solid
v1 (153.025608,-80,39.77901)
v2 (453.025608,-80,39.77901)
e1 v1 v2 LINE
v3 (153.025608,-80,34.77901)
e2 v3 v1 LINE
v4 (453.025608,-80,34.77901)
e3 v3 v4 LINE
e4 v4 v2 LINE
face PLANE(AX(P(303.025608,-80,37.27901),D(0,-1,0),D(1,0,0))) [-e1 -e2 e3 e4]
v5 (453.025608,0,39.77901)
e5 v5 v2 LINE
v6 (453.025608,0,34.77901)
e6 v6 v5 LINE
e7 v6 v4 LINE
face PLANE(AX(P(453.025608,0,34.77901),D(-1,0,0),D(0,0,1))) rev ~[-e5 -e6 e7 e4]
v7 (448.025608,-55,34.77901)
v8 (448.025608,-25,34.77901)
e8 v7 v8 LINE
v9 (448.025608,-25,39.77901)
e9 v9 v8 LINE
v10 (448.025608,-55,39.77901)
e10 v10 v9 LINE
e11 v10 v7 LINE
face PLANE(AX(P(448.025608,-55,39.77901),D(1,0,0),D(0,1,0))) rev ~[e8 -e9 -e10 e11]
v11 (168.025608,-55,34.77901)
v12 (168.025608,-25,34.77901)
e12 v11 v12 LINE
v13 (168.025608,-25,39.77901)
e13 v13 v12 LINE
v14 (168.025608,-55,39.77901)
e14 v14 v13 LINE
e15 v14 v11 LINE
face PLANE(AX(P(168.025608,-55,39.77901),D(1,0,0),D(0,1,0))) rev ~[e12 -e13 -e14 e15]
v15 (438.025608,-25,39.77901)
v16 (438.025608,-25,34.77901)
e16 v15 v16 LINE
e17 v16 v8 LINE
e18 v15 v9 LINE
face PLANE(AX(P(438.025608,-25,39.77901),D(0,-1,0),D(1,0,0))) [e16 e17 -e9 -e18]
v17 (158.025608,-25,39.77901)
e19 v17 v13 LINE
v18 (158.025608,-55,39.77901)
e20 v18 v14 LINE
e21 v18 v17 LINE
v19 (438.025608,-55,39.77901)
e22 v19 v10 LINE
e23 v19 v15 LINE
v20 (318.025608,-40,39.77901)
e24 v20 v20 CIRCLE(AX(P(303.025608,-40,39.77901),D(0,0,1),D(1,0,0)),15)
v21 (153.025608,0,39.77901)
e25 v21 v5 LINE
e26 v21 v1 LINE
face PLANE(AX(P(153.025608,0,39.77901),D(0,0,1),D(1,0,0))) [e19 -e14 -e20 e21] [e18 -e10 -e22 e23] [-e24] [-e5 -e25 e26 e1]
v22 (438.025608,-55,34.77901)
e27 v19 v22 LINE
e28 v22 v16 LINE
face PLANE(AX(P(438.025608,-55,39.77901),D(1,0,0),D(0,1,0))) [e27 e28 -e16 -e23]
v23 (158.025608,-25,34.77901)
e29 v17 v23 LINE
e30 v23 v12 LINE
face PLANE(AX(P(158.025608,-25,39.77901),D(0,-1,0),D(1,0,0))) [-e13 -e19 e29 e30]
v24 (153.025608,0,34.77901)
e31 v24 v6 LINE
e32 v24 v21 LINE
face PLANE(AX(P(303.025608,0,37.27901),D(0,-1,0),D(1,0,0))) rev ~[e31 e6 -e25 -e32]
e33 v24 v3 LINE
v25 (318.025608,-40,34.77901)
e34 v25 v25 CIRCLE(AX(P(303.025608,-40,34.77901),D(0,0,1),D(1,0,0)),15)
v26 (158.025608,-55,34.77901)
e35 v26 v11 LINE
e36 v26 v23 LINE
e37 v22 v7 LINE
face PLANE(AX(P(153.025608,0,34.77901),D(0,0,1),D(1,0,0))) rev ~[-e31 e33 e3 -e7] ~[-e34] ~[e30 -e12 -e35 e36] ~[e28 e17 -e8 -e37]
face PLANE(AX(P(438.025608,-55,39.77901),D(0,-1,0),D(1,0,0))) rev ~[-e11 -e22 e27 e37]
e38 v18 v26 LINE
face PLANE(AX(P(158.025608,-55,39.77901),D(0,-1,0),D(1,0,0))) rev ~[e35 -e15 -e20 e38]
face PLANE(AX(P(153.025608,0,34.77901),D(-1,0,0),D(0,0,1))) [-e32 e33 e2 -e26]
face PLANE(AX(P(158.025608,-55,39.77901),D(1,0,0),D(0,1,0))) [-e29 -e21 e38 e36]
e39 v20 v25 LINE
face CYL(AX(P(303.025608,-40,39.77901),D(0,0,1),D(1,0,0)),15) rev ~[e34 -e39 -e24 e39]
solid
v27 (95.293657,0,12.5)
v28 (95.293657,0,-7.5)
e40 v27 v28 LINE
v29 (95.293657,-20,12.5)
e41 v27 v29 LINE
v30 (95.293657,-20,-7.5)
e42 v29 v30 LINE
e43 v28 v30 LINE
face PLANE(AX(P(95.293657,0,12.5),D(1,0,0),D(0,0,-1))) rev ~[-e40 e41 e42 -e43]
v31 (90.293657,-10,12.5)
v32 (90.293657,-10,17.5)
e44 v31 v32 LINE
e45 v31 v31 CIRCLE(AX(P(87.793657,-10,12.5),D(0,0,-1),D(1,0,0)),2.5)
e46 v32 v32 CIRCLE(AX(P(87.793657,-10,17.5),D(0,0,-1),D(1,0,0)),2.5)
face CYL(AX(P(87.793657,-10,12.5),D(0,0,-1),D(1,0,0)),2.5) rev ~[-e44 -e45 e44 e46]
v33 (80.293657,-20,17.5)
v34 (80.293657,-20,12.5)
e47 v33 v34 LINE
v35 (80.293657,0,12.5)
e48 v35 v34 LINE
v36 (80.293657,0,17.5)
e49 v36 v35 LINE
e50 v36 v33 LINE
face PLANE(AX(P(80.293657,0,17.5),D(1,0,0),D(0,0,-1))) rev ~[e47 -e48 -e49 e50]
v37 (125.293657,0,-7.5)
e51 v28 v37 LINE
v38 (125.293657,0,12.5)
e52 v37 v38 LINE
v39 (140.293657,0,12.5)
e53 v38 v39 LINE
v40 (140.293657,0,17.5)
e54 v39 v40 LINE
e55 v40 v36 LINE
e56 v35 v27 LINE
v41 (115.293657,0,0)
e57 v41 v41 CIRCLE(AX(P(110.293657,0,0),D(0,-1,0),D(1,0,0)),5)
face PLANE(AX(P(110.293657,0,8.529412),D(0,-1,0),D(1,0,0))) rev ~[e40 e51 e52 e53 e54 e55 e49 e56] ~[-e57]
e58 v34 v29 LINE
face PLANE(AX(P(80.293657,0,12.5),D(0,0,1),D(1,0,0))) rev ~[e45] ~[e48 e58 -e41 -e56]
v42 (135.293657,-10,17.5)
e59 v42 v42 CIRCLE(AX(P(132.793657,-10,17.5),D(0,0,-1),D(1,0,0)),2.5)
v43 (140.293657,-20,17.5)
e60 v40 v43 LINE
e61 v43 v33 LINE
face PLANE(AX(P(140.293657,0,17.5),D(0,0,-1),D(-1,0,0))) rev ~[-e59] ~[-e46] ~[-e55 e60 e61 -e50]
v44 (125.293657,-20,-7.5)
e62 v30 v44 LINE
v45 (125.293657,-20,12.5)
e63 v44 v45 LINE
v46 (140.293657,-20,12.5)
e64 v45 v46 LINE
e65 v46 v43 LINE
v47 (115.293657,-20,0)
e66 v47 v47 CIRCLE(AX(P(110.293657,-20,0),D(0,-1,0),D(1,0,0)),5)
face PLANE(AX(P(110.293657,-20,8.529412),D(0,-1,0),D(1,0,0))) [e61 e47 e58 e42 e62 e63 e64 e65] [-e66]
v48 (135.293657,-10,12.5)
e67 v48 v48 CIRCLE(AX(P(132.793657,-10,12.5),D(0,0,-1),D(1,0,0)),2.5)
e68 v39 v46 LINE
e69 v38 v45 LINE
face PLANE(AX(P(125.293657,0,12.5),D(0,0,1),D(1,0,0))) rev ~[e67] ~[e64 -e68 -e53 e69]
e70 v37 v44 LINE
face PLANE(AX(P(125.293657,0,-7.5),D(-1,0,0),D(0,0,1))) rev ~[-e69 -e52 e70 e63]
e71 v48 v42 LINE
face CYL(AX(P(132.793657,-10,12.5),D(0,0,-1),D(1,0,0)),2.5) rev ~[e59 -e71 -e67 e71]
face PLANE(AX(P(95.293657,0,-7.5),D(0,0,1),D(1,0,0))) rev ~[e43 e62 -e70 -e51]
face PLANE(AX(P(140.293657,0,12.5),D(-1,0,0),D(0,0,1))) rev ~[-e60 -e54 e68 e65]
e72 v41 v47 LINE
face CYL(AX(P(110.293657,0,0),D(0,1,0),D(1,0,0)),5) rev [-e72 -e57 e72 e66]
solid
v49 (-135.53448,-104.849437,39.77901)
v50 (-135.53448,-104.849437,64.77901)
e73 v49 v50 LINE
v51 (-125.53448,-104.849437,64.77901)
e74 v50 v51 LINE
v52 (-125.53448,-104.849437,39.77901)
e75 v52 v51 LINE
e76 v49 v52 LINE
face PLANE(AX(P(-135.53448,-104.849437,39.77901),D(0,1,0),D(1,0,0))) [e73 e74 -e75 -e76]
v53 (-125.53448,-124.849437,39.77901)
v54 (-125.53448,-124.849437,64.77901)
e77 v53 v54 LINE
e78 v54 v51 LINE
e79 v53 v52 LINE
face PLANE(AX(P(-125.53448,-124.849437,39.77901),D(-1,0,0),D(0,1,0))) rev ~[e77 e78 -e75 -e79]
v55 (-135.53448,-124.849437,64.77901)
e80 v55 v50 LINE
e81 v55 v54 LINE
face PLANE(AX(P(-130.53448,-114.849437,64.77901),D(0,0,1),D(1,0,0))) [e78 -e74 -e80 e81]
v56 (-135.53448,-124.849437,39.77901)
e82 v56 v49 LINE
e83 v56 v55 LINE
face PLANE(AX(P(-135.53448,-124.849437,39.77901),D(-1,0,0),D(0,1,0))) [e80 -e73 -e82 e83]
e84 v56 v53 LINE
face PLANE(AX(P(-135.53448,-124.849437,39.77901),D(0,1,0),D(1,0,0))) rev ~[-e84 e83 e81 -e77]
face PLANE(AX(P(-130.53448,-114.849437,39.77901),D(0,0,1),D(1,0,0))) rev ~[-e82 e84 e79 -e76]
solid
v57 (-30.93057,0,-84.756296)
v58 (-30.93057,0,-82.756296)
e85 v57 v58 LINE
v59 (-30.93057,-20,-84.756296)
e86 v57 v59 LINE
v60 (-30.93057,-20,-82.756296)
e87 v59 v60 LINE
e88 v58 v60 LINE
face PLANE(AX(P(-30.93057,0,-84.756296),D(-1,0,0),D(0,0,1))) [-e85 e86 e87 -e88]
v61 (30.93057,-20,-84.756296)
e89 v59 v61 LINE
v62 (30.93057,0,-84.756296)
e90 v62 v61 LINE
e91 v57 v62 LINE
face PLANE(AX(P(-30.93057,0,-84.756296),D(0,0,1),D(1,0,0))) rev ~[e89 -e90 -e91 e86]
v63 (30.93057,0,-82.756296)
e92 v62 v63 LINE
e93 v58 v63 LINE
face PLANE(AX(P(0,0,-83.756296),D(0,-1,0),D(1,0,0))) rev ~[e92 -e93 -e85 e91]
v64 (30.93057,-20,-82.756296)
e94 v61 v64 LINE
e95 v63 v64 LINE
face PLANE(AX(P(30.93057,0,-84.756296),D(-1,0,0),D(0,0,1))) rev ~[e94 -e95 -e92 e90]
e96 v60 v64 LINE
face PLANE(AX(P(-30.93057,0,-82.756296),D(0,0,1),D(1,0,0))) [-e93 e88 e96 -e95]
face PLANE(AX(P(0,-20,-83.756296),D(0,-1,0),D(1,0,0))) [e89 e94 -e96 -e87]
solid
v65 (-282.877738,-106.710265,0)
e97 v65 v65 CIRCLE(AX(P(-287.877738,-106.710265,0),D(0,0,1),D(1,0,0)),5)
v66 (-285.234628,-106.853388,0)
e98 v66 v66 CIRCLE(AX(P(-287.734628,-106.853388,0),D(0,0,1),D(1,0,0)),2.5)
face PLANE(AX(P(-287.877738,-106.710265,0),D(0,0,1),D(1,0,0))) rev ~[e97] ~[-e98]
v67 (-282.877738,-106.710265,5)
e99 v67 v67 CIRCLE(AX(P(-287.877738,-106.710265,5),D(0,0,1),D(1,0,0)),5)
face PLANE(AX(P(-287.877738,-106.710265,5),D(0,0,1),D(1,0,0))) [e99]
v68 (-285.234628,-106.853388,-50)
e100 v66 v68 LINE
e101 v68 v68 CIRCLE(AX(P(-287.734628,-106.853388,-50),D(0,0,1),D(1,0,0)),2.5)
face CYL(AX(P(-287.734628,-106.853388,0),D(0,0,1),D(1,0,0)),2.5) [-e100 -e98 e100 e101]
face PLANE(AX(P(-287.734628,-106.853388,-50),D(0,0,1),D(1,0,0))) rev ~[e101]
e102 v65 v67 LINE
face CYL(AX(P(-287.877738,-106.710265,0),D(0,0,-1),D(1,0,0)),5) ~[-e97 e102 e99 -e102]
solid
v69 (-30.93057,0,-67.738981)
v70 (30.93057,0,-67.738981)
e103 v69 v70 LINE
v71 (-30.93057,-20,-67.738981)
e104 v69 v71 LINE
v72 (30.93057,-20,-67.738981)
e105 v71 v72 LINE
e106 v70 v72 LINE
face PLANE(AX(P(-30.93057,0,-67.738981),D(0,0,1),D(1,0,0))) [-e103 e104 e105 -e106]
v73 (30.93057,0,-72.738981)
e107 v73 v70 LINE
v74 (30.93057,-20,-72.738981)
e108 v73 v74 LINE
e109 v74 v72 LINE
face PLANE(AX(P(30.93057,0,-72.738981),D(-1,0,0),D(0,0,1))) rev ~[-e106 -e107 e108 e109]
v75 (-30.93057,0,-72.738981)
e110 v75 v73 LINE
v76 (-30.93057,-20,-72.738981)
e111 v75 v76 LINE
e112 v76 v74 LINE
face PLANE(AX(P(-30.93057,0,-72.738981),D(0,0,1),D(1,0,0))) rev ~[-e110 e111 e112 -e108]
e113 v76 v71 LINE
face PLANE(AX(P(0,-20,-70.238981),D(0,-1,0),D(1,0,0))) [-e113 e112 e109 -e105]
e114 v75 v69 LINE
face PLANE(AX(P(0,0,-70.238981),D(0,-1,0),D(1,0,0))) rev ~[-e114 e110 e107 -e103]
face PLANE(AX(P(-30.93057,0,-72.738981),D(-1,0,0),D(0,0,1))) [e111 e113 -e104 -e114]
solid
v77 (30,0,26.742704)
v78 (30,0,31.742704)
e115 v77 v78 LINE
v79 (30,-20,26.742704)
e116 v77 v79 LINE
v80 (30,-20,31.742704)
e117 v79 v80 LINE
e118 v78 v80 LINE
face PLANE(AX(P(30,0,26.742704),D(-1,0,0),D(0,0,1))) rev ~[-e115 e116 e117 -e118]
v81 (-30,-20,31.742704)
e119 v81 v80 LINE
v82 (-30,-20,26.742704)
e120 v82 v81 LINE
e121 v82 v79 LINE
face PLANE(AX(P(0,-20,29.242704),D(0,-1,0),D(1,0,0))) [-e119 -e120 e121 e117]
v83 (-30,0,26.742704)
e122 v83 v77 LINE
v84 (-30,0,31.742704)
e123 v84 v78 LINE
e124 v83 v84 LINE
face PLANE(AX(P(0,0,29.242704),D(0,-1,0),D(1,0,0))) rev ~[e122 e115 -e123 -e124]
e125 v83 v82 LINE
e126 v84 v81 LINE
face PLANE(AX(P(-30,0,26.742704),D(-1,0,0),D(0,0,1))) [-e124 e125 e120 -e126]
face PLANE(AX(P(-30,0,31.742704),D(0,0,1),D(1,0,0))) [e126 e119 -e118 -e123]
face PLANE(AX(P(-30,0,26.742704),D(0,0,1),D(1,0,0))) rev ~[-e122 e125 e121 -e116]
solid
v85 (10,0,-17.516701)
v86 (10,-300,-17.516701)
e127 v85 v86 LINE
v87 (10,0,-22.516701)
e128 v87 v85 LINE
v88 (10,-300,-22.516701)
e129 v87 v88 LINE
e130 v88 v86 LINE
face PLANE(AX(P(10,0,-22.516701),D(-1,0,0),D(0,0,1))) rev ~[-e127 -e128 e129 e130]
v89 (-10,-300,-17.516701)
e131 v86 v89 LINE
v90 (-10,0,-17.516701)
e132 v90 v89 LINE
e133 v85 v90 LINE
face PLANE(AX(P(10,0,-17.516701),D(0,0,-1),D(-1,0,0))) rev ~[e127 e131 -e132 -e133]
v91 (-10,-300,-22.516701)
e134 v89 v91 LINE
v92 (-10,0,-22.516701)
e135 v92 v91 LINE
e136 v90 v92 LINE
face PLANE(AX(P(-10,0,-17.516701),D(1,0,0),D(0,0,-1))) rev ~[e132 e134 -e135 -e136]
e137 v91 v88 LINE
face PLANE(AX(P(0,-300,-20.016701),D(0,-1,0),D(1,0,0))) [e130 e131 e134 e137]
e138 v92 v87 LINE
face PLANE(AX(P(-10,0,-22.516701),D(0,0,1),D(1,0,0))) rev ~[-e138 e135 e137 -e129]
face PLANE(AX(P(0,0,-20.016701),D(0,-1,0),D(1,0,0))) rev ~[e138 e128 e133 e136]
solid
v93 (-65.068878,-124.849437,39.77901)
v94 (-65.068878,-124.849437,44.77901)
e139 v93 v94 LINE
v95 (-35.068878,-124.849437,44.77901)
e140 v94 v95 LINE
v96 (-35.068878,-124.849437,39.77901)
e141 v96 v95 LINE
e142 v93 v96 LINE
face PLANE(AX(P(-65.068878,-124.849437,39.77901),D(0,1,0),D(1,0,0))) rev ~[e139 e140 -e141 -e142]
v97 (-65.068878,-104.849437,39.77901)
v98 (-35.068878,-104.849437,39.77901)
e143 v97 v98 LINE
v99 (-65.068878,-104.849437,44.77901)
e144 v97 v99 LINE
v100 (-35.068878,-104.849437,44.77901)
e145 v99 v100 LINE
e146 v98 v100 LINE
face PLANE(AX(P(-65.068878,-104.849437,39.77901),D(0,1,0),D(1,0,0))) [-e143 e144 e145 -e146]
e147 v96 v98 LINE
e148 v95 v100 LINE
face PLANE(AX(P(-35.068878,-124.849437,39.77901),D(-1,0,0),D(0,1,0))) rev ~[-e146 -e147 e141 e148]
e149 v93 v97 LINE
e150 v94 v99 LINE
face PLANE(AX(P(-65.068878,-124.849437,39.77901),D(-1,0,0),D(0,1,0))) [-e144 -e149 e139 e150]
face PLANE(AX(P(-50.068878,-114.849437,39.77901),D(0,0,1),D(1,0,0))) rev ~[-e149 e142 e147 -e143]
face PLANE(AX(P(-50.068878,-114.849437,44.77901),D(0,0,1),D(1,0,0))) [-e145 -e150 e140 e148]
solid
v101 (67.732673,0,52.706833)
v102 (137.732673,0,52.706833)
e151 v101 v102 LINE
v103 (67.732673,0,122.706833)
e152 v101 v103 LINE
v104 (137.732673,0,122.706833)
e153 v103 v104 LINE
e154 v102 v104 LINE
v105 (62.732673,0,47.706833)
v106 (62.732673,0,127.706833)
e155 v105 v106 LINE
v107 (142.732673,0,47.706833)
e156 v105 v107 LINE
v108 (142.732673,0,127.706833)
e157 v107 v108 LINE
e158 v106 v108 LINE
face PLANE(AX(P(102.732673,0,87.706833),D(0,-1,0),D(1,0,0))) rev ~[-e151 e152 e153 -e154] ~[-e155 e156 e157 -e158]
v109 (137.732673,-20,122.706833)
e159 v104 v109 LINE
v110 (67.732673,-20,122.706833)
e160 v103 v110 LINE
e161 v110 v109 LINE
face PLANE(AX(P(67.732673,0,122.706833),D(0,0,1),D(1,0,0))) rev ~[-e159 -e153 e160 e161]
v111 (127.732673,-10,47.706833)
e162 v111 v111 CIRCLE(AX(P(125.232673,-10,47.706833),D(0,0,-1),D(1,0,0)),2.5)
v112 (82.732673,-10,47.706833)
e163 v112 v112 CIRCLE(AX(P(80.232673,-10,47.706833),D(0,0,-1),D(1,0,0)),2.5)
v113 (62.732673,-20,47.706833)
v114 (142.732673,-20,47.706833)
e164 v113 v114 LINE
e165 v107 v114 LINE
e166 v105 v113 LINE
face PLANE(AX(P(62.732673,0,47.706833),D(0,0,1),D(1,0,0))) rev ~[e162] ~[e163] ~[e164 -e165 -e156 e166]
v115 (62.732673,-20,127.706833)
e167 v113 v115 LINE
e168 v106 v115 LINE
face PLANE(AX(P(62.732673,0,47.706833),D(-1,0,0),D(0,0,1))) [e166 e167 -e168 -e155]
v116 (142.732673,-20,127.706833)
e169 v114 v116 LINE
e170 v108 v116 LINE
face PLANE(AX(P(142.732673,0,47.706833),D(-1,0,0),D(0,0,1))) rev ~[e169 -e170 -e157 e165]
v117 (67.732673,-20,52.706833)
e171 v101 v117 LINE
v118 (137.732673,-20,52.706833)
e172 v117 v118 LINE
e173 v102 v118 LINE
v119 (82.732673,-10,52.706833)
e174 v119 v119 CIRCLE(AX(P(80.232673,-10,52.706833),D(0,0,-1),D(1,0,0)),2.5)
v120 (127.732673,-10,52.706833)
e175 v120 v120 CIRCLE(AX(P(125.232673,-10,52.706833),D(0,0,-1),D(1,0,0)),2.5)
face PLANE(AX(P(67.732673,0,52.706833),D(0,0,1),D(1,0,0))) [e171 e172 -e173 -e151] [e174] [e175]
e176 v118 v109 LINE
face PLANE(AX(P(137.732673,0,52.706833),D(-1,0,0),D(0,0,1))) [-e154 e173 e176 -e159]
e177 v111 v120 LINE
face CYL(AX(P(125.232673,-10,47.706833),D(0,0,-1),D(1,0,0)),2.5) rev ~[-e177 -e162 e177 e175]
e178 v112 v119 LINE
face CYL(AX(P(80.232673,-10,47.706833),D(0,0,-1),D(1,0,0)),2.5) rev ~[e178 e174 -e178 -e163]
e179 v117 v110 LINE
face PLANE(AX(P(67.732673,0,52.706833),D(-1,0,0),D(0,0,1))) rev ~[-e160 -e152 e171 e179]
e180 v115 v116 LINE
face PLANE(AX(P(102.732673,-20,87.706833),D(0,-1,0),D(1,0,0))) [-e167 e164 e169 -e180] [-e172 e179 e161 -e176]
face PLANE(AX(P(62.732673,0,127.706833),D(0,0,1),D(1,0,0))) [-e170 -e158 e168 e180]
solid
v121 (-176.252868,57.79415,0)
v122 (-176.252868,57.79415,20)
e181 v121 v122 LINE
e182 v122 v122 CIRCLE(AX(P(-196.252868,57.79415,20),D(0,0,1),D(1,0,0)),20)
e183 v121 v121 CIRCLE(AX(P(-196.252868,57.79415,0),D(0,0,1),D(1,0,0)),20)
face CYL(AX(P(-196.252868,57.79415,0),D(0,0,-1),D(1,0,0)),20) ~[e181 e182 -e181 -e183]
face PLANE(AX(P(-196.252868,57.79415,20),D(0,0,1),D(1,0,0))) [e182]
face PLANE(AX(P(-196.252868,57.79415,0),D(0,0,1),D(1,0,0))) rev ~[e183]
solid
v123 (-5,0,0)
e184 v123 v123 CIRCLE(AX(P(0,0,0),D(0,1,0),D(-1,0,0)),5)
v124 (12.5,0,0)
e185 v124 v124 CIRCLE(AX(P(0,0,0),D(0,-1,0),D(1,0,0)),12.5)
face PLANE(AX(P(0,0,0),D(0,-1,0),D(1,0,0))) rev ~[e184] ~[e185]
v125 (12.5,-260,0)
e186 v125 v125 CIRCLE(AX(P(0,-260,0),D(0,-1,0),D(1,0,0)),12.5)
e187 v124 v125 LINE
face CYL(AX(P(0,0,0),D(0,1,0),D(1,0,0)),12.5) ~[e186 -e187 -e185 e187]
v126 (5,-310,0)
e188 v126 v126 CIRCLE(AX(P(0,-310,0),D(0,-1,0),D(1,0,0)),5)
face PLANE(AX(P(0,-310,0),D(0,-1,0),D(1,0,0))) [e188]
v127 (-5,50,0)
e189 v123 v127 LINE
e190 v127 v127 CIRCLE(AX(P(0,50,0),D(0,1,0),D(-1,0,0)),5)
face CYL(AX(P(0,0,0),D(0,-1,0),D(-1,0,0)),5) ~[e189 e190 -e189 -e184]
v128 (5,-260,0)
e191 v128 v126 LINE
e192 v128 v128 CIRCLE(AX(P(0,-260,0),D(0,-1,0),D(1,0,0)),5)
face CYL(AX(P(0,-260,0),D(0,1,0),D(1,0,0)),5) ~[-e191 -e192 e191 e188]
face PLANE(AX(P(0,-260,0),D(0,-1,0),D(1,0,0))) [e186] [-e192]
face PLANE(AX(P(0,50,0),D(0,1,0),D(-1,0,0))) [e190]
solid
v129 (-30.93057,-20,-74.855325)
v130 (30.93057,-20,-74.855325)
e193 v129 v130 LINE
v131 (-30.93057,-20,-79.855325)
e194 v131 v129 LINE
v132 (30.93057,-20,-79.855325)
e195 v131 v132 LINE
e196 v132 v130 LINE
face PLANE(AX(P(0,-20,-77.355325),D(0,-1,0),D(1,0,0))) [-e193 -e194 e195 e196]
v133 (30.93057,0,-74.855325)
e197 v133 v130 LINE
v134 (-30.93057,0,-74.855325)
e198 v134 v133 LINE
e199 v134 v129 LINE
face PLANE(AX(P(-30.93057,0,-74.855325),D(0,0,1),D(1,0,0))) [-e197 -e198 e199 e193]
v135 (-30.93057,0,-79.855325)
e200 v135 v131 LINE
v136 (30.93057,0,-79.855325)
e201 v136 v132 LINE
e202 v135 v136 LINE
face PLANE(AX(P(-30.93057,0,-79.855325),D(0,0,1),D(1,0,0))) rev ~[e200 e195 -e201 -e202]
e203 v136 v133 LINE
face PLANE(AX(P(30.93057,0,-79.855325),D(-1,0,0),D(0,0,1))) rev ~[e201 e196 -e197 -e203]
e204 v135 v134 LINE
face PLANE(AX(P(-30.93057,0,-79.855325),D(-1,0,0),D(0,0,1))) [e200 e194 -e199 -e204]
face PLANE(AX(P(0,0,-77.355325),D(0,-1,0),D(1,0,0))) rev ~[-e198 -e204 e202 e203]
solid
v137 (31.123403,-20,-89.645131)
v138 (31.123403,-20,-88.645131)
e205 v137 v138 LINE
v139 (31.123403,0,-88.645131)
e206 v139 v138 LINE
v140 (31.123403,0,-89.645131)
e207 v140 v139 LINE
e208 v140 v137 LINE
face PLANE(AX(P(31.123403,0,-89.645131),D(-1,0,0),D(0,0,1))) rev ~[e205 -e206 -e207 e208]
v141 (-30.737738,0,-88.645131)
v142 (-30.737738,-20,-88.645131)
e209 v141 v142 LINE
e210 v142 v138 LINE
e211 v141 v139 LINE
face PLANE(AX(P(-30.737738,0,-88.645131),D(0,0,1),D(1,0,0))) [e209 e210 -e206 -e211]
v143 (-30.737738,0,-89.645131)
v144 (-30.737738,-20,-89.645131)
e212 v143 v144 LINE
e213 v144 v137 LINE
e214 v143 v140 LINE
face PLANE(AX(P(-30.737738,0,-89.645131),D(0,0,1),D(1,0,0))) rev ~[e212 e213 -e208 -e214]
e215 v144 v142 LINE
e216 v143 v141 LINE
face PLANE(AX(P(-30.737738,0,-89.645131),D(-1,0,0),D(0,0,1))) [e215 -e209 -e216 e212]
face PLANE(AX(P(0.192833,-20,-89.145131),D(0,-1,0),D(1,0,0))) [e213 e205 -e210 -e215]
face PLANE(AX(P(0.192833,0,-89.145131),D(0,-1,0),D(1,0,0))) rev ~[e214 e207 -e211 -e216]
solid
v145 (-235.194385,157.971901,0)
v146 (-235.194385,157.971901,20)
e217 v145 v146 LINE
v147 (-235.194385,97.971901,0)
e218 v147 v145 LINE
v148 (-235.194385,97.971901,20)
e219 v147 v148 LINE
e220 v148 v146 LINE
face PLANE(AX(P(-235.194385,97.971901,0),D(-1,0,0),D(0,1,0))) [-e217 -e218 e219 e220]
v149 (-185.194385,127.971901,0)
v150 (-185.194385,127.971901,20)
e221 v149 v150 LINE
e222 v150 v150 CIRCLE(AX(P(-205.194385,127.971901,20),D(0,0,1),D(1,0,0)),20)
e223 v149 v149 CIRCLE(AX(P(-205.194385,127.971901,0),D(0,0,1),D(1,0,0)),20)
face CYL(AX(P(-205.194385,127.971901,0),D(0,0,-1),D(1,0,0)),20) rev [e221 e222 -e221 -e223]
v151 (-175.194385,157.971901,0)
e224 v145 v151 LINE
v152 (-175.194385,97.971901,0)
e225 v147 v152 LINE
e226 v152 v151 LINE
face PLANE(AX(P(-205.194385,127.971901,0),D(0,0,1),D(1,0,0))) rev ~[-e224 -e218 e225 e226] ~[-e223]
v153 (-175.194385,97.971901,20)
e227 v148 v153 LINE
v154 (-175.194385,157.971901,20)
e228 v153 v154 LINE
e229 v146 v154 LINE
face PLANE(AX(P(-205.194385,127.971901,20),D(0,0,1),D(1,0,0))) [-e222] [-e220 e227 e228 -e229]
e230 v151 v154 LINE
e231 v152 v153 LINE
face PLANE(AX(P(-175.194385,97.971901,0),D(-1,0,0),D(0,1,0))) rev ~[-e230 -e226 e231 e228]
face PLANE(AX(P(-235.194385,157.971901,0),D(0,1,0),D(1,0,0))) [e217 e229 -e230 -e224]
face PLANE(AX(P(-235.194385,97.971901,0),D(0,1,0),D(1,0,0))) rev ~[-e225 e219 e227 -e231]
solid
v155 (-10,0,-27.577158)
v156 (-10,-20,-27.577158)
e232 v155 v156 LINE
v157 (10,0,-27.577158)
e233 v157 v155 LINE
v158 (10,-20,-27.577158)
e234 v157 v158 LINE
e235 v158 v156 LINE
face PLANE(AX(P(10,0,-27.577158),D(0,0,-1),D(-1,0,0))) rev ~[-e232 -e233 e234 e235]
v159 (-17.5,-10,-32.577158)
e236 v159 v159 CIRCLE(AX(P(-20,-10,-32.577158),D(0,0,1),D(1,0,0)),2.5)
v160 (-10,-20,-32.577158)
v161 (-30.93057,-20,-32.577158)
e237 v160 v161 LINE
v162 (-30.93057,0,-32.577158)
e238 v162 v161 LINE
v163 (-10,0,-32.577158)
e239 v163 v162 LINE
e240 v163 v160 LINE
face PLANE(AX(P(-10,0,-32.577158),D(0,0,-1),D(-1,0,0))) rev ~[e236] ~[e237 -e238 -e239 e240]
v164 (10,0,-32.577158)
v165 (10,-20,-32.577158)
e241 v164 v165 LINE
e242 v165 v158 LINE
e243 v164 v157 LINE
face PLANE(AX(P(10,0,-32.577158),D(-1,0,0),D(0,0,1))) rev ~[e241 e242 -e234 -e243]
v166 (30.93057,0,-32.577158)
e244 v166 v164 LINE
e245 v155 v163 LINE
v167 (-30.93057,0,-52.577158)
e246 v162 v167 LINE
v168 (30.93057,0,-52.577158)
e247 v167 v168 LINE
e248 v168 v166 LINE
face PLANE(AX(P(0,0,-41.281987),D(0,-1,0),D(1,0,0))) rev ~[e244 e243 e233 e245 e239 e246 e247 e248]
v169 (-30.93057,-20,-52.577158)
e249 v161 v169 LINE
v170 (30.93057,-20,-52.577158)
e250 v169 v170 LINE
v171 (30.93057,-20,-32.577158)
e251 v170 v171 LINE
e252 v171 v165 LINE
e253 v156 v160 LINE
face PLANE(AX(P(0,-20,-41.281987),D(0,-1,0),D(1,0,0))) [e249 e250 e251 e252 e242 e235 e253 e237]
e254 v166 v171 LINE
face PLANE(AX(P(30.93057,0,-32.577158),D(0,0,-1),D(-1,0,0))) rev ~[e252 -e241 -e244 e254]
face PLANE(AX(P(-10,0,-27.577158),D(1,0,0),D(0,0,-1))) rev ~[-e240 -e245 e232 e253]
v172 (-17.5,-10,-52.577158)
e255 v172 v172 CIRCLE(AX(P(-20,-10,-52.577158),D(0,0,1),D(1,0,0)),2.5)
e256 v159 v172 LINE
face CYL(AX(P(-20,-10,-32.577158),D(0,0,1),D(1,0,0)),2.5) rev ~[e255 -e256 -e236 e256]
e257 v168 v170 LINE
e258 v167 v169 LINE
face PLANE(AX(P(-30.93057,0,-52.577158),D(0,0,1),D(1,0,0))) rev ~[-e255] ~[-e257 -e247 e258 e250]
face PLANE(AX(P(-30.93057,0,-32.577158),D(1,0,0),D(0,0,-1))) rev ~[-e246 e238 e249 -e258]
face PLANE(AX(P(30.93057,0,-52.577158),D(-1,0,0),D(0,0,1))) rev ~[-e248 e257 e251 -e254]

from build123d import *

# Parameters (mm, degrees)
F0_R      = 5
F1_DEPTH  = 20
F0_W      = 60
F0_H      = 5
F0_W_2    = 80
F0_H_2    = 80
F0_W_3    = 70
F0_H_3    = 70
F0_W_4    = 61.861140081
F0_H_4    = 1
F0_H_5    = 2
F0_R_2    = 12.5
F2_DEPTH  = 260
F3_R      = 5
F4_DEPTH  = 50
F5_DEPTH  = 300
F6_R      = 2.5
F7_DEPTH  = 25
F9_R      = 2.5
F8_R      = 2.5
F10_DEPTH = 25
F14_R     = 5
F15_DEPTH = 50
F16_W     = 300
F16_H     = 5
F17_DEPTH = 80
F19_R     = 20
F20_DEPTH = 20
F19_W     = 60
F19_H     = 60
F21_DEPTH = 20
F18_W     = 10
F18_H     = 30
F18_R     = 15
F22_DEPTH = 129.4251411048
F18_H_2   = 20
F23_DEPTH = 25
F18_W_2   = 30
F24_DEPTH = 5
F13_R     = 2.5
F25_DEPTH = 5
F26_R     = 5
F27_DEPTH = 5
F28_R     = 2.5
F29_DEPTH = 50


# Not quite as in the source:
# - a feature of the source that left no trace in its solid (it failed there, or was rolled back) is left out
# - a feature names something its author has since deleted; it is built from what else it names


with BuildPart() as f1:
    # F0 (on Front) → F1 (new body)
    with BuildSketch(Plane.XZ):
        Polygon((95.2936565876, -7.5), (110.2936565876, -7.5), (125.2936565876, -7.5), (125.2936565876, 12.5), (140.2936565876, 12.5), (140.2936565876, 17.5), (110.2936565876, 17.5), (80.2936565876, 17.5), (80.2936565876, 12.5), (95.2936565876, 12.5), align=None)
        with Locations((110.2936565876, 0)):
            Circle(F0_R, mode=Mode.SUBTRACT)
    extrude(amount=F1_DEPTH)

    # F9 (on face) + F8 (on face) → F10 (cut)
    with BuildSketch(Plane(origin=(0, 0, 12.5), x_dir=(1, 0, 0), z_dir=(0, 0, -1))):
        with Locations((87.7936565876, 10)):
            Circle(F9_R)
    with BuildSketch(Plane(origin=(0, 0, 12.5), x_dir=(1, 0, 0), z_dir=(0, 0, -1))):
        with Locations((132.7936565876, 10)):
            Circle(F8_R)
    extrude(amount=-F10_DEPTH, mode=Mode.SUBTRACT)


with BuildPart() as f1b:
    # F0 (on Front) → F1, piece 2 (new body)
    with BuildSketch(Plane.XZ):
        with Locations((0, 29.2427036911)):
            Rectangle(F0_W, F0_H)
    extrude(amount=F1_DEPTH)


with BuildPart() as f1c:
    # F0 (on Front) → F1, piece 3 (new body)
    with BuildSketch(Plane.XZ):
        Polygon((10, -27.5771580637), (0, -27.5771580637), (-10, -27.5771580637), (-10, -32.5771580637), (-10.9305700405, -32.5771580637), (-30.9305700405, -32.5771580637), (-30.9305700405, -52.5771580637), (0, -52.5771580637), (30.9305700405, -52.5771580637), (30.9305700405, -32.5771580637), (10.9305700405, -32.5771580637), (10, -32.5771580637), align=None)
    extrude(amount=F1_DEPTH)

    # F6 (on face) → F7 (cut)
    with BuildSketch(Plane.XY.offset(-32.5771580637)):
        with Locations((-20, -10)):
            Circle(F6_R)
    extrude(amount=-F7_DEPTH, mode=Mode.SUBTRACT)


with BuildPart() as f1d:
    # F0 (on Front) → F1, piece 4 (new body)
    with BuildSketch(Plane.XZ):
        with Locations((102.7326732874, 87.7068325877)):
            Rectangle(F0_W_2, F0_H_2)
        with Locations((102.7326732874, 87.7068325877)):
            Rectangle(F0_W_3, F0_H_3, mode=Mode.SUBTRACT)
    extrude(amount=F1_DEPTH)

    # F13 (on face) → F25 (cut, through all)
    with BuildSketch(Plane(origin=(0, 0, 47.7068325877), x_dir=(1, 0, 0), z_dir=(0, 0, -1))):
        with Locations((125.2326732874, 10)):
            Circle(F13_R)
        with Locations((80.2326732874, 10)):
            Circle(F13_R)
    extrude(amount=-F25_DEPTH, mode=Mode.SUBTRACT)


with BuildPart() as f1e:
    # F0 (on Front) → F1, piece 5 (new body)
    with BuildSketch(Plane.XZ):
        with Locations((0, -77.355325222)):
            Rectangle(F0_W_4, F0_H)
    extrude(amount=F1_DEPTH)


with BuildPart() as f1f:
    # F0 (on Front) → F1, piece 6 (new body)
    with BuildSketch(Plane.XZ):
        with Locations((0.1928325291, -89.1451310813)):
            Rectangle(F0_W_4, F0_H_4)
    extrude(amount=F1_DEPTH)


with BuildPart() as f1g:
    # F0 (on Front) → F1, piece 7 (new body)
    with BuildSketch(Plane.XZ):
        with Locations((0, -83.756296128)):
            Rectangle(F0_W_4, F0_H_5)
    extrude(amount=F1_DEPTH)


with BuildPart() as f1h:
    # F0 (on Front) → F1, piece 8 (new body)
    with BuildSketch(Plane.XZ):
        with Locations((0, -70.2389810979)):
            Rectangle(F0_W_4, F0_H)
    extrude(amount=F1_DEPTH)


with BuildPart() as f2:
    # F0 (on Front) → F2 (new body)
    with BuildSketch(Plane.XZ):
        Circle(F0_R_2)
    extrude(amount=F2_DEPTH)

    # F3 (on face) → F4 (join)
    with BuildSketch(Plane.XZ.offset(260)):
        Circle(F3_R)
    extrude(amount=F4_DEPTH)

    # F14 (on face) → F15 (join)
    with BuildSketch(Plane(origin=(0, 0, 0), x_dir=(-1, 0, 0), z_dir=(0, 1, 0))):
        Circle(F14_R)
    extrude(amount=F15_DEPTH)


with BuildPart() as f5:
    # F0 (on Front) → F5 (new body)
    with BuildSketch(Plane.XZ):
        Polygon((-10, -22.5167013705), (0, -22.5167013705), (10, -22.5167013705), (10, -17.5167013705), (0, -17.5167013705), (-10, -17.5167013705), align=None)
    extrude(amount=F5_DEPTH)


with BuildPart() as f17:
    # F16 (on Front) → F17 (new body)
    with BuildSketch(Plane.XZ):
        with Locations((303.0256081372, 37.2790100235)):
            Rectangle(F16_W, F16_H)
    extrude(amount=F17_DEPTH)

    # F18 (on face) → F22 (cut, through all)
    with BuildSketch(Plane.XY.offset(39.7790100235)):
        with Locations((163.0256081372, -40)):
            Rectangle(F18_W, F18_H)
        with Locations((443.0256081372, -40)):
            Rectangle(F18_W, F18_H)
        with Locations((303.0256081372, -40)):
            Circle(F18_R)
    extrude(amount=-F22_DEPTH, mode=Mode.SUBTRACT)


with BuildPart() as f20:
    # F19 (on Top) → F20 (new body)
    with BuildSketch(Plane.XY):
        with Locations((-196.2528675795, 57.794149965)):
            Circle(F19_R)
    extrude(amount=F20_DEPTH)


with BuildPart() as f21:
    # F19 (on Top) → F21 (new body)
    with BuildSketch(Plane.XY):
        with Locations((-205.1943850517, 127.9719012976)):
            Rectangle(F19_W, F19_H)
        with Locations((-205.1943850517, 127.9719012976)):
            Circle(F19_R, mode=Mode.SUBTRACT)
    extrude(amount=F21_DEPTH)


with BuildPart() as f23:
    # F18 (on face) → F23 (new body)
    with BuildSketch(Plane.XY.offset(39.7790100235)):
        with Locations((-130.5344802141, -114.8494374752)):
            Rectangle(F18_W, F18_H_2)
    extrude(amount=F23_DEPTH)


with BuildPart() as f24:
    # F18 (on face) → F24 (new body)
    with BuildSketch(Plane.XY.offset(39.7790100235)):
        with Locations((-50.0688782334, -114.8494374752)):
            Rectangle(F18_W_2, F18_H_2)
    extrude(amount=F24_DEPTH)


with BuildPart() as f27:
    # F26 (on Top) → F27 (new body)
    with BuildSketch(Plane.XY):
        with Locations((-287.8777384163, -106.7102653366)):
            Circle(F26_R)
    extrude(amount=F27_DEPTH)

    # F28 (on face) → F29 (join)
    with BuildSketch(Plane.XY):
        with Locations((-287.7346277237, -106.8533882499)):
            Circle(F28_R)
    extrude(amount=-F29_DEPTH)


solid = Compound([f1.part, f1b.part, f1c.part, f1d.part, f1e.part, f1f.part, f1g.part, f1h.part, f2.part, f5.part, f17.part, f20.part, f21.part, f23.part, f24.part, f27.part])
